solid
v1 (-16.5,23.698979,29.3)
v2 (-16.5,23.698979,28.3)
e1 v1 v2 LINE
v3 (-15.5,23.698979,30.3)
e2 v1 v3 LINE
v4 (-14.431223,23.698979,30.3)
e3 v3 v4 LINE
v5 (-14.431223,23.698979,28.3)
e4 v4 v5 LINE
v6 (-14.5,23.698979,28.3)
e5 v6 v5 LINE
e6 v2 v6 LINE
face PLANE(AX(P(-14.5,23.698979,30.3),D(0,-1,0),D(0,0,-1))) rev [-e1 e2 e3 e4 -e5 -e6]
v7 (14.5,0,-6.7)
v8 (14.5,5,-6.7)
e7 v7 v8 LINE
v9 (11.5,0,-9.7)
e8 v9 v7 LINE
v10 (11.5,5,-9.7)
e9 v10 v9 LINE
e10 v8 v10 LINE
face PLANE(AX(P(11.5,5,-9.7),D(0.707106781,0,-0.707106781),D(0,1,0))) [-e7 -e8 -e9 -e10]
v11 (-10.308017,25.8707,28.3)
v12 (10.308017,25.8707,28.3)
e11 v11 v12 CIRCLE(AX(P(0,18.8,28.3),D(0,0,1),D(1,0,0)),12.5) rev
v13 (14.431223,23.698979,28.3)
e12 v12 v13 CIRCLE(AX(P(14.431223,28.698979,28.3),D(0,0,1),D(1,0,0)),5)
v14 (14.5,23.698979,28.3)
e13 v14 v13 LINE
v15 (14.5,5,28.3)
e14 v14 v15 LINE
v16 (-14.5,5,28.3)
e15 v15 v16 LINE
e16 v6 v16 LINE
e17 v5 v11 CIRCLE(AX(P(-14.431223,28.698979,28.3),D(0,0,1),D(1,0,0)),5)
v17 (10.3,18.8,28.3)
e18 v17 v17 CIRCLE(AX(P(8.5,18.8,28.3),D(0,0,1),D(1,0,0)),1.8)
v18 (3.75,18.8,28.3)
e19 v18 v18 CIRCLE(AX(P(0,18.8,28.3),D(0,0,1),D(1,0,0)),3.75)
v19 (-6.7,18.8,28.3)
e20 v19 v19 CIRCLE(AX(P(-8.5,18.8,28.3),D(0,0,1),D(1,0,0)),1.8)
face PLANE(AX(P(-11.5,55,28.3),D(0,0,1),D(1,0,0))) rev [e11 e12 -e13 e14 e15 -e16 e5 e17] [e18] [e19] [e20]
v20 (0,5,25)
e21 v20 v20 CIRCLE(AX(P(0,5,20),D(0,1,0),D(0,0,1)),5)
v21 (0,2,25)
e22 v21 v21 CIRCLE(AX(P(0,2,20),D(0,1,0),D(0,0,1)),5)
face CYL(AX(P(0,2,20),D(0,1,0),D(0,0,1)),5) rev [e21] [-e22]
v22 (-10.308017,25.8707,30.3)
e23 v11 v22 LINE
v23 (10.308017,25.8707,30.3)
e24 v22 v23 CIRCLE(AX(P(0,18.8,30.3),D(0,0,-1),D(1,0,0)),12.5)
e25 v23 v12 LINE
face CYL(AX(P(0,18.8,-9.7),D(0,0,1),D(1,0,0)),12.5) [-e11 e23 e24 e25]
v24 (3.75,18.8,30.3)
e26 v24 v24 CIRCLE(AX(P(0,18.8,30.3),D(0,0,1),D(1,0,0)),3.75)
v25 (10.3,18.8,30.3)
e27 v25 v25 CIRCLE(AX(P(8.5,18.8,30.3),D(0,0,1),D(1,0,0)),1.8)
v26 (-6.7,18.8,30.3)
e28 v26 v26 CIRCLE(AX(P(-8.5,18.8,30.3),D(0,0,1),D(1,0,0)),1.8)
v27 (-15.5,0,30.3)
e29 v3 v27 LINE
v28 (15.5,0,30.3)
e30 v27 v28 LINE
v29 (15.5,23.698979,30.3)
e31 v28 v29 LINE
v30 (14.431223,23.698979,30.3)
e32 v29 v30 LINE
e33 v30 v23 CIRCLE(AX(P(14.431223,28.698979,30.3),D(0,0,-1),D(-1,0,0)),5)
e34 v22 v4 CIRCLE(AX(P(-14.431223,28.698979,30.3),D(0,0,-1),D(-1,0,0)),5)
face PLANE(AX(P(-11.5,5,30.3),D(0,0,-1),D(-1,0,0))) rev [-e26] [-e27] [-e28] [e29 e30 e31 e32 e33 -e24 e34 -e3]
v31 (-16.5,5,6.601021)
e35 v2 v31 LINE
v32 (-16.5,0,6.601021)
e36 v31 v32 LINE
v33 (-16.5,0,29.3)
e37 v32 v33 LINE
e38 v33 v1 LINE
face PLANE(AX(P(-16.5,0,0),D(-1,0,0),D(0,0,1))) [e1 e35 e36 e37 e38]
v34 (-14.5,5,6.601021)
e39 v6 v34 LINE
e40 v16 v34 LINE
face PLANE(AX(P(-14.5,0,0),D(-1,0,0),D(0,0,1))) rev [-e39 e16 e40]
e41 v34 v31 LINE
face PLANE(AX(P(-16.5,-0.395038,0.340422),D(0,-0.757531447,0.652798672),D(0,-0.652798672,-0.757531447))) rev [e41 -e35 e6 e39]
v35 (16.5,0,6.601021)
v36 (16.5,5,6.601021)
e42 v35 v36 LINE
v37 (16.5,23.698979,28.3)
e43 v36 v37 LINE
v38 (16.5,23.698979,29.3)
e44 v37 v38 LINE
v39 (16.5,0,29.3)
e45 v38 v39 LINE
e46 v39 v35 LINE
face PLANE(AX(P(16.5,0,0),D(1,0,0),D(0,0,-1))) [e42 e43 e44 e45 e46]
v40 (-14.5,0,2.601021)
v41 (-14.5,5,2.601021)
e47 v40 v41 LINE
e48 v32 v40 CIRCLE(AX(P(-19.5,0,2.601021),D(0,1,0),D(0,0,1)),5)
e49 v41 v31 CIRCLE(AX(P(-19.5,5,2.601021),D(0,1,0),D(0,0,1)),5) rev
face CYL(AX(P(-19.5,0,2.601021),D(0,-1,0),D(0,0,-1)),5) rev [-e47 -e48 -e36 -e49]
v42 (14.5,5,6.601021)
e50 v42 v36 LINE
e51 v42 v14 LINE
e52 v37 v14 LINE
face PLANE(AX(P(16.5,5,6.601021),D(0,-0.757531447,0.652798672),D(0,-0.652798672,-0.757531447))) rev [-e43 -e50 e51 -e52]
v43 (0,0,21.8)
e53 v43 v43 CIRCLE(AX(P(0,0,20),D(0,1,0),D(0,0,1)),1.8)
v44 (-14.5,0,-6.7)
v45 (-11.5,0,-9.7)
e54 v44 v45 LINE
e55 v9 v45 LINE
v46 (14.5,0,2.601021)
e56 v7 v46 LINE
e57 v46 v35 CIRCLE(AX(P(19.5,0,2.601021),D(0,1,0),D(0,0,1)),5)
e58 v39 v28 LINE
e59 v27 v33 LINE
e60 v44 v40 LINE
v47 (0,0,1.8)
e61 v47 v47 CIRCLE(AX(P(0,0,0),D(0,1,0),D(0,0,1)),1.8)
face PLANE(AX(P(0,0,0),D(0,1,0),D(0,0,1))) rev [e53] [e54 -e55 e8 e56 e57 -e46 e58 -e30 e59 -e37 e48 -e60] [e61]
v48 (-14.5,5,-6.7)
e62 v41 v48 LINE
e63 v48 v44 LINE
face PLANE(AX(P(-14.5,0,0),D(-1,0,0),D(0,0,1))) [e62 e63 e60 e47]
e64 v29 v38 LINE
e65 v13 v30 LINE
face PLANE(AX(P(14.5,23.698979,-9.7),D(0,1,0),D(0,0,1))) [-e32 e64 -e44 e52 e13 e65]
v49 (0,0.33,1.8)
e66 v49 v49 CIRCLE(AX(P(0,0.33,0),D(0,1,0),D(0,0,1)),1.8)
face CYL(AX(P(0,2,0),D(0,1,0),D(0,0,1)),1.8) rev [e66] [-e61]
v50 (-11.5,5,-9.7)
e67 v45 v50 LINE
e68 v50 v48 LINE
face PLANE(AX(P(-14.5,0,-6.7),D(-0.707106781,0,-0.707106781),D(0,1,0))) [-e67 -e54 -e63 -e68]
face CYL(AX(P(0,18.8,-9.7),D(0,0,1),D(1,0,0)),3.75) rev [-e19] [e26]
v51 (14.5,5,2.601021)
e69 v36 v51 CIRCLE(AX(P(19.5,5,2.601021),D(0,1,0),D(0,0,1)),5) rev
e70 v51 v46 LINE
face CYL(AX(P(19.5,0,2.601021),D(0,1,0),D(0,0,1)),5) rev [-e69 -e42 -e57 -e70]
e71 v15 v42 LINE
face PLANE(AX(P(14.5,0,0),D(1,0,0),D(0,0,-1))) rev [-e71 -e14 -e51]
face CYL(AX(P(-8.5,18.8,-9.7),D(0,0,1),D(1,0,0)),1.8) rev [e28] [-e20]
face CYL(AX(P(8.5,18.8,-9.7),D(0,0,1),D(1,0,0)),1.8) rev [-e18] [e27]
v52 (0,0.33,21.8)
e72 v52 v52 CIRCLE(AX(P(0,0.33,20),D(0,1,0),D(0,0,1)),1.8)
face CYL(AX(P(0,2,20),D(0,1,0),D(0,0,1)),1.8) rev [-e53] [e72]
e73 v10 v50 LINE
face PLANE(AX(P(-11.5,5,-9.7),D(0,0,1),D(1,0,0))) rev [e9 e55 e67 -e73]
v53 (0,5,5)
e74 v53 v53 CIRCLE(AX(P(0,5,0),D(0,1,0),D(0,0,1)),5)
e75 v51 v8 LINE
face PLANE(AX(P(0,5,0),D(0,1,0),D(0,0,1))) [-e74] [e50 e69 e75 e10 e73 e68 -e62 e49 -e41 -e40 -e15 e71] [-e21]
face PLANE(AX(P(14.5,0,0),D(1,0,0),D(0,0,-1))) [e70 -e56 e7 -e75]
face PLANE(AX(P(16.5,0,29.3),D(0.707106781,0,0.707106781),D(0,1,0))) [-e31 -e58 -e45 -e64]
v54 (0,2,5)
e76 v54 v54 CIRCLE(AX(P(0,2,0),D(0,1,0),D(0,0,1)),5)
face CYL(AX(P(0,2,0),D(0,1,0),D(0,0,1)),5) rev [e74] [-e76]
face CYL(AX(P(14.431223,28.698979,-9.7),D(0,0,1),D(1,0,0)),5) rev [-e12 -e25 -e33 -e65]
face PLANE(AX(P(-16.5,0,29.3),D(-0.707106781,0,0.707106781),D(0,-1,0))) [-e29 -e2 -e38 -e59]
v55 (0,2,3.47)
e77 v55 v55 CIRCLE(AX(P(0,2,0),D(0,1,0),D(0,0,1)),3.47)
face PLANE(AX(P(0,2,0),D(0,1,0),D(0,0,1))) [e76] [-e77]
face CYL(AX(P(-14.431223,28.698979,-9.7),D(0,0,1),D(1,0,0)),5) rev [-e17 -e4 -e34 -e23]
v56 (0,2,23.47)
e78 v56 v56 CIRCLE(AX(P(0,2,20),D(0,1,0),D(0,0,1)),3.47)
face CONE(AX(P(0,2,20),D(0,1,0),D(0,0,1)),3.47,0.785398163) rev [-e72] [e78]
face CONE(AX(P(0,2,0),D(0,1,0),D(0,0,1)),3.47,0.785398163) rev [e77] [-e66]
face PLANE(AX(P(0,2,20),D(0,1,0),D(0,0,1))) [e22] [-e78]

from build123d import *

# Parameters (mm, degrees)
SKETCH1_W                                    = 23
SKETCH1_H                                    = 40
SKETCH1_R                                    = 1.75
BOSS_EXTRUDE1_DEPTH                          = 5
SKETCH2_W                                    = 23
SKETCH2_H                                    = 2
BOSS_EXTRUDE2_DEPTH                          = 50
SKETCH3_R                                    = 1.8
SKETCH3_R_2                                  = 3.75
CUT_EXTRUDE1_DEPTH                           = 69.972820734
BOSS_EXTRUDE3_DEPTH                          = 3
BOSS_EXTRUDE4_START                          = -23
BOSS_EXTRUDE4_DEPTH                          = 3
BOSS_EXTRUDE5_DEPTH                          = 2
BOSS_EXTRUDE6_START                          = -29
BOSS_EXTRUDE6_DEPTH                          = 2
SKETCH6_R                                    = 5
CUT_EXTRUDE2_DEPTH                           = 3
CSK_FOR_M3_HEX_SOCKET_COUNTERSUNK_HE_2_COUNT = 2
CSK_FOR_M3_HEX_SOCKET_COUNTERSUNK_HE_2_PITCH = 20
CHAMFER1_SIZE                                = 3
CHAMFER2_SIZE                                = 1
FILLET1_R                                    = 5


with BuildPart() as part:
    # Sketch1 → Boss-Extrude1 (new body)
    with BuildSketch(Plane(origin=(0, 0, 0), x_dir=(1, 0, 0), z_dir=(0, 1, 0))):
        with Locations((0, -10.3)):
            Rectangle(SKETCH1_W, SKETCH1_H)
        with Locations(Location((0, 0, 0), (0, 0, 270))):
            Circle(SKETCH1_R, mode=Mode.SUBTRACT)
        with Locations(Location((0, -20, 0), (0, 0, 270))):
            Circle(SKETCH1_R, mode=Mode.SUBTRACT)
    extrude(amount=BOSS_EXTRUDE1_DEPTH)

    # Sketch2 → Boss-Extrude2 (add)
    with BuildSketch(Plane(origin=(0, 5, 0), x_dir=(1, 0, 0), z_dir=(0, 1, 0))):
        with Locations((0, -29.3)):
            Rectangle(SKETCH2_W, SKETCH2_H)
    extrude(amount=BOSS_EXTRUDE2_DEPTH)

    # Sketch3 → Cut-Extrude1 (cut, through all)
    with BuildSketch(Plane.XY.offset(30.3)):
        with Locations((-8.5, 18.8)):
            Circle(SKETCH3_R)
        with Locations((8.5, 18.8)):
            Circle(SKETCH3_R)
        with Locations((0, 18.8)):
            Circle(SKETCH3_R_2)
        with BuildLine():
            Line((-11.5, 23.698979486), (-11.5, 55))
            Line((-11.5, 55), (11.5, 55))
            Line((11.5, 55), (11.5, 23.698979486))
            ThreePointArc((11.5, 23.698979486), (0, 31.3), (-11.5, 23.698979486))
        make_face()
    extrude(amount=-CUT_EXTRUDE1_DEPTH, mode=Mode.SUBTRACT)

    # Sketch4 → Boss-Extrude3 (add)
    with BuildSketch(Plane.ZY.offset(11.5)):
        Polygon((30.3, 0), (30.3, 23.698979486), (28.3, 23.698979486), (28.3, 5), (-9.7, 5), (-9.7, 0), align=None)
    extrude(amount=BOSS_EXTRUDE3_DEPTH)

    # Sketch4<2> → Boss-Extrude4 (add)
    with BuildSketch(Plane.ZY.offset(11.5).offset(BOSS_EXTRUDE4_START)):
        Polygon((30.3, 0), (30.3, 23.698979486), (28.3, 23.698979486), (28.3, 5), (-9.7, 5), (-9.7, 0), align=None)
    extrude(amount=-BOSS_EXTRUDE4_DEPTH)

    # Sketch5 → Boss-Extrude5 (add)
    with BuildSketch(Plane(origin=(14.5, 0, 0), x_dir=(0, 0, -1), z_dir=(1, 0, 0))):
        Polygon((-30.3, 23.698979486), (-30.3, 0), (-6.601020514, 0), (-6.601020514, 5), (-28.3, 23.698979486), align=None)
    extrude(amount=BOSS_EXTRUDE5_DEPTH)

    # Sketch5<2> → Boss-Extrude6 (add)
    with BuildSketch(Plane(origin=(14.5, 0, 0), x_dir=(0, 0, -1), z_dir=(1, 0, 0)).offset(BOSS_EXTRUDE6_START)):
        Polygon((-30.3, 23.698979486), (-30.3, 0), (-6.601020514, 0), (-6.601020514, 5), (-28.3, 23.698979486), align=None)
    extrude(amount=-BOSS_EXTRUDE6_DEPTH)

    # Sketch6 → Cut-Extrude2 (cut)
    with BuildSketch(Plane(origin=(0, 5, 0), x_dir=(1, 0, 0), z_dir=(0, 1, 0))):
        with Locations(Location((0, 0, 0), (0, 0, 270))):
            Circle(SKETCH6_R)
        with Locations(Location((0, -20, 0), (0, 0, 270))):
            Circle(SKETCH6_R)
    extrude(amount=-CUT_EXTRUDE2_DEPTH, mode=Mode.SUBTRACT)

    # Sketch8 → CSK for M3 Hex Socket Countersunk Head Screw1 (revolve, cut)
    with BuildSketch(Plane(origin=(0, 2, 0), x_dir=(0, 0, 1), z_dir=(1, 0, 0))):
        Polygon((0, 0), (0, 2), (1.8, 2), (1.8, 1.67), (3.47, 0), align=None)
    csk_for_m3_hex_socket_countersunk_head_s = revolve(axis=Axis((0, 8.35, 0), (0, -1, 0)), mode=Mode.SUBTRACT)

    # CSK for M3 Hex Socket Countersunk He 2: CSK for M3 Hex Socket Countersunk Head Screw1 ×2
    with Locations(*[(0, 0, i * CSK_FOR_M3_HEX_SOCKET_COUNTERSUNK_HE_2_PITCH) for i in range(1, CSK_FOR_M3_HEX_SOCKET_COUNTERSUNK_HE_2_COUNT)]):
        add(csk_for_m3_hex_socket_countersunk_head_s, mode=Mode.SUBTRACT)

    # Chamfer1
    chamfer1_edges = [part.edges().sort_by_distance(p)[0] for p in [
        (-14.5, 2.5, -9.7),
        (14.5, 2.5, -9.7),
    ]]
    chamfer(chamfer1_edges, length=CHAMFER1_SIZE)

    # Chamfer2
    chamfer2_edges = [part.edges().sort_by_distance(p)[0] for p in [
        (16.5, 11.849489743, 30.3),
        (-16.5, 11.849489743, 30.3),
    ]]
    chamfer(chamfer2_edges, length=CHAMFER2_SIZE)

    # Fillet1
    # the kernel refuses this fillet: 5 mm, written as the material it adds along each edge
    with BuildSketch(Plane(origin=(11.5, 23.698979486, 30.3), x_dir=(1, 0, 0), z_dir=(0, 0, -1))) as fillet1_piece_1:
        with BuildLine():
            CenterArc((2.931223273, -5), FILLET1_R, 90, 55.552144514)
            ThreePointArc((-1.191983377, -2.171720147), (-0.54205816, -1.115462354), (0, 0))
            Line((0, 0), (2.931223273, 0))
        make_face()
    extrude(amount=2)
    with BuildSketch(Plane(origin=(-11.5, 23.698979486, 30.3), x_dir=(-1, 0, 0), z_dir=(0, 0, -1))) as fillet1_piece_2:
        with BuildLine():
            CenterArc((2.931223273, 5), FILLET1_R, 214.447855486, 55.552144514)
            ThreePointArc((-1.191983377, 2.171720147), (-0.54205816, 1.115462354), (0, 0))
            Line((0, 0), (2.931223273, 0))
        make_face()
    extrude(amount=2)
    with BuildSketch(Plane(origin=(-14.5, 0, 6.601020514), x_dir=(-1, 0, 0), z_dir=(0, 1, 0))) as fillet1_piece_3:
        with BuildLine():
            CenterArc((5, -4), FILLET1_R, 126.869897646, 53.130102354)
            Line((0, -4), (0, 0))
            Line((0, 0), (2, 0))
        make_face()
    extrude(amount=5)
    with BuildSketch(Plane(origin=(14.5, 0, 6.601020514), x_dir=(1, 0, 0), z_dir=(0, 1, 0))) as fillet1_piece_4:
        with BuildLine():
            CenterArc((5, 4), FILLET1_R, 180, 53.130102354)
            Line((0, 4), (0, 0))
            Line((0, 0), (2, 0))
        make_face()
    extrude(amount=5)


solid = part.part
